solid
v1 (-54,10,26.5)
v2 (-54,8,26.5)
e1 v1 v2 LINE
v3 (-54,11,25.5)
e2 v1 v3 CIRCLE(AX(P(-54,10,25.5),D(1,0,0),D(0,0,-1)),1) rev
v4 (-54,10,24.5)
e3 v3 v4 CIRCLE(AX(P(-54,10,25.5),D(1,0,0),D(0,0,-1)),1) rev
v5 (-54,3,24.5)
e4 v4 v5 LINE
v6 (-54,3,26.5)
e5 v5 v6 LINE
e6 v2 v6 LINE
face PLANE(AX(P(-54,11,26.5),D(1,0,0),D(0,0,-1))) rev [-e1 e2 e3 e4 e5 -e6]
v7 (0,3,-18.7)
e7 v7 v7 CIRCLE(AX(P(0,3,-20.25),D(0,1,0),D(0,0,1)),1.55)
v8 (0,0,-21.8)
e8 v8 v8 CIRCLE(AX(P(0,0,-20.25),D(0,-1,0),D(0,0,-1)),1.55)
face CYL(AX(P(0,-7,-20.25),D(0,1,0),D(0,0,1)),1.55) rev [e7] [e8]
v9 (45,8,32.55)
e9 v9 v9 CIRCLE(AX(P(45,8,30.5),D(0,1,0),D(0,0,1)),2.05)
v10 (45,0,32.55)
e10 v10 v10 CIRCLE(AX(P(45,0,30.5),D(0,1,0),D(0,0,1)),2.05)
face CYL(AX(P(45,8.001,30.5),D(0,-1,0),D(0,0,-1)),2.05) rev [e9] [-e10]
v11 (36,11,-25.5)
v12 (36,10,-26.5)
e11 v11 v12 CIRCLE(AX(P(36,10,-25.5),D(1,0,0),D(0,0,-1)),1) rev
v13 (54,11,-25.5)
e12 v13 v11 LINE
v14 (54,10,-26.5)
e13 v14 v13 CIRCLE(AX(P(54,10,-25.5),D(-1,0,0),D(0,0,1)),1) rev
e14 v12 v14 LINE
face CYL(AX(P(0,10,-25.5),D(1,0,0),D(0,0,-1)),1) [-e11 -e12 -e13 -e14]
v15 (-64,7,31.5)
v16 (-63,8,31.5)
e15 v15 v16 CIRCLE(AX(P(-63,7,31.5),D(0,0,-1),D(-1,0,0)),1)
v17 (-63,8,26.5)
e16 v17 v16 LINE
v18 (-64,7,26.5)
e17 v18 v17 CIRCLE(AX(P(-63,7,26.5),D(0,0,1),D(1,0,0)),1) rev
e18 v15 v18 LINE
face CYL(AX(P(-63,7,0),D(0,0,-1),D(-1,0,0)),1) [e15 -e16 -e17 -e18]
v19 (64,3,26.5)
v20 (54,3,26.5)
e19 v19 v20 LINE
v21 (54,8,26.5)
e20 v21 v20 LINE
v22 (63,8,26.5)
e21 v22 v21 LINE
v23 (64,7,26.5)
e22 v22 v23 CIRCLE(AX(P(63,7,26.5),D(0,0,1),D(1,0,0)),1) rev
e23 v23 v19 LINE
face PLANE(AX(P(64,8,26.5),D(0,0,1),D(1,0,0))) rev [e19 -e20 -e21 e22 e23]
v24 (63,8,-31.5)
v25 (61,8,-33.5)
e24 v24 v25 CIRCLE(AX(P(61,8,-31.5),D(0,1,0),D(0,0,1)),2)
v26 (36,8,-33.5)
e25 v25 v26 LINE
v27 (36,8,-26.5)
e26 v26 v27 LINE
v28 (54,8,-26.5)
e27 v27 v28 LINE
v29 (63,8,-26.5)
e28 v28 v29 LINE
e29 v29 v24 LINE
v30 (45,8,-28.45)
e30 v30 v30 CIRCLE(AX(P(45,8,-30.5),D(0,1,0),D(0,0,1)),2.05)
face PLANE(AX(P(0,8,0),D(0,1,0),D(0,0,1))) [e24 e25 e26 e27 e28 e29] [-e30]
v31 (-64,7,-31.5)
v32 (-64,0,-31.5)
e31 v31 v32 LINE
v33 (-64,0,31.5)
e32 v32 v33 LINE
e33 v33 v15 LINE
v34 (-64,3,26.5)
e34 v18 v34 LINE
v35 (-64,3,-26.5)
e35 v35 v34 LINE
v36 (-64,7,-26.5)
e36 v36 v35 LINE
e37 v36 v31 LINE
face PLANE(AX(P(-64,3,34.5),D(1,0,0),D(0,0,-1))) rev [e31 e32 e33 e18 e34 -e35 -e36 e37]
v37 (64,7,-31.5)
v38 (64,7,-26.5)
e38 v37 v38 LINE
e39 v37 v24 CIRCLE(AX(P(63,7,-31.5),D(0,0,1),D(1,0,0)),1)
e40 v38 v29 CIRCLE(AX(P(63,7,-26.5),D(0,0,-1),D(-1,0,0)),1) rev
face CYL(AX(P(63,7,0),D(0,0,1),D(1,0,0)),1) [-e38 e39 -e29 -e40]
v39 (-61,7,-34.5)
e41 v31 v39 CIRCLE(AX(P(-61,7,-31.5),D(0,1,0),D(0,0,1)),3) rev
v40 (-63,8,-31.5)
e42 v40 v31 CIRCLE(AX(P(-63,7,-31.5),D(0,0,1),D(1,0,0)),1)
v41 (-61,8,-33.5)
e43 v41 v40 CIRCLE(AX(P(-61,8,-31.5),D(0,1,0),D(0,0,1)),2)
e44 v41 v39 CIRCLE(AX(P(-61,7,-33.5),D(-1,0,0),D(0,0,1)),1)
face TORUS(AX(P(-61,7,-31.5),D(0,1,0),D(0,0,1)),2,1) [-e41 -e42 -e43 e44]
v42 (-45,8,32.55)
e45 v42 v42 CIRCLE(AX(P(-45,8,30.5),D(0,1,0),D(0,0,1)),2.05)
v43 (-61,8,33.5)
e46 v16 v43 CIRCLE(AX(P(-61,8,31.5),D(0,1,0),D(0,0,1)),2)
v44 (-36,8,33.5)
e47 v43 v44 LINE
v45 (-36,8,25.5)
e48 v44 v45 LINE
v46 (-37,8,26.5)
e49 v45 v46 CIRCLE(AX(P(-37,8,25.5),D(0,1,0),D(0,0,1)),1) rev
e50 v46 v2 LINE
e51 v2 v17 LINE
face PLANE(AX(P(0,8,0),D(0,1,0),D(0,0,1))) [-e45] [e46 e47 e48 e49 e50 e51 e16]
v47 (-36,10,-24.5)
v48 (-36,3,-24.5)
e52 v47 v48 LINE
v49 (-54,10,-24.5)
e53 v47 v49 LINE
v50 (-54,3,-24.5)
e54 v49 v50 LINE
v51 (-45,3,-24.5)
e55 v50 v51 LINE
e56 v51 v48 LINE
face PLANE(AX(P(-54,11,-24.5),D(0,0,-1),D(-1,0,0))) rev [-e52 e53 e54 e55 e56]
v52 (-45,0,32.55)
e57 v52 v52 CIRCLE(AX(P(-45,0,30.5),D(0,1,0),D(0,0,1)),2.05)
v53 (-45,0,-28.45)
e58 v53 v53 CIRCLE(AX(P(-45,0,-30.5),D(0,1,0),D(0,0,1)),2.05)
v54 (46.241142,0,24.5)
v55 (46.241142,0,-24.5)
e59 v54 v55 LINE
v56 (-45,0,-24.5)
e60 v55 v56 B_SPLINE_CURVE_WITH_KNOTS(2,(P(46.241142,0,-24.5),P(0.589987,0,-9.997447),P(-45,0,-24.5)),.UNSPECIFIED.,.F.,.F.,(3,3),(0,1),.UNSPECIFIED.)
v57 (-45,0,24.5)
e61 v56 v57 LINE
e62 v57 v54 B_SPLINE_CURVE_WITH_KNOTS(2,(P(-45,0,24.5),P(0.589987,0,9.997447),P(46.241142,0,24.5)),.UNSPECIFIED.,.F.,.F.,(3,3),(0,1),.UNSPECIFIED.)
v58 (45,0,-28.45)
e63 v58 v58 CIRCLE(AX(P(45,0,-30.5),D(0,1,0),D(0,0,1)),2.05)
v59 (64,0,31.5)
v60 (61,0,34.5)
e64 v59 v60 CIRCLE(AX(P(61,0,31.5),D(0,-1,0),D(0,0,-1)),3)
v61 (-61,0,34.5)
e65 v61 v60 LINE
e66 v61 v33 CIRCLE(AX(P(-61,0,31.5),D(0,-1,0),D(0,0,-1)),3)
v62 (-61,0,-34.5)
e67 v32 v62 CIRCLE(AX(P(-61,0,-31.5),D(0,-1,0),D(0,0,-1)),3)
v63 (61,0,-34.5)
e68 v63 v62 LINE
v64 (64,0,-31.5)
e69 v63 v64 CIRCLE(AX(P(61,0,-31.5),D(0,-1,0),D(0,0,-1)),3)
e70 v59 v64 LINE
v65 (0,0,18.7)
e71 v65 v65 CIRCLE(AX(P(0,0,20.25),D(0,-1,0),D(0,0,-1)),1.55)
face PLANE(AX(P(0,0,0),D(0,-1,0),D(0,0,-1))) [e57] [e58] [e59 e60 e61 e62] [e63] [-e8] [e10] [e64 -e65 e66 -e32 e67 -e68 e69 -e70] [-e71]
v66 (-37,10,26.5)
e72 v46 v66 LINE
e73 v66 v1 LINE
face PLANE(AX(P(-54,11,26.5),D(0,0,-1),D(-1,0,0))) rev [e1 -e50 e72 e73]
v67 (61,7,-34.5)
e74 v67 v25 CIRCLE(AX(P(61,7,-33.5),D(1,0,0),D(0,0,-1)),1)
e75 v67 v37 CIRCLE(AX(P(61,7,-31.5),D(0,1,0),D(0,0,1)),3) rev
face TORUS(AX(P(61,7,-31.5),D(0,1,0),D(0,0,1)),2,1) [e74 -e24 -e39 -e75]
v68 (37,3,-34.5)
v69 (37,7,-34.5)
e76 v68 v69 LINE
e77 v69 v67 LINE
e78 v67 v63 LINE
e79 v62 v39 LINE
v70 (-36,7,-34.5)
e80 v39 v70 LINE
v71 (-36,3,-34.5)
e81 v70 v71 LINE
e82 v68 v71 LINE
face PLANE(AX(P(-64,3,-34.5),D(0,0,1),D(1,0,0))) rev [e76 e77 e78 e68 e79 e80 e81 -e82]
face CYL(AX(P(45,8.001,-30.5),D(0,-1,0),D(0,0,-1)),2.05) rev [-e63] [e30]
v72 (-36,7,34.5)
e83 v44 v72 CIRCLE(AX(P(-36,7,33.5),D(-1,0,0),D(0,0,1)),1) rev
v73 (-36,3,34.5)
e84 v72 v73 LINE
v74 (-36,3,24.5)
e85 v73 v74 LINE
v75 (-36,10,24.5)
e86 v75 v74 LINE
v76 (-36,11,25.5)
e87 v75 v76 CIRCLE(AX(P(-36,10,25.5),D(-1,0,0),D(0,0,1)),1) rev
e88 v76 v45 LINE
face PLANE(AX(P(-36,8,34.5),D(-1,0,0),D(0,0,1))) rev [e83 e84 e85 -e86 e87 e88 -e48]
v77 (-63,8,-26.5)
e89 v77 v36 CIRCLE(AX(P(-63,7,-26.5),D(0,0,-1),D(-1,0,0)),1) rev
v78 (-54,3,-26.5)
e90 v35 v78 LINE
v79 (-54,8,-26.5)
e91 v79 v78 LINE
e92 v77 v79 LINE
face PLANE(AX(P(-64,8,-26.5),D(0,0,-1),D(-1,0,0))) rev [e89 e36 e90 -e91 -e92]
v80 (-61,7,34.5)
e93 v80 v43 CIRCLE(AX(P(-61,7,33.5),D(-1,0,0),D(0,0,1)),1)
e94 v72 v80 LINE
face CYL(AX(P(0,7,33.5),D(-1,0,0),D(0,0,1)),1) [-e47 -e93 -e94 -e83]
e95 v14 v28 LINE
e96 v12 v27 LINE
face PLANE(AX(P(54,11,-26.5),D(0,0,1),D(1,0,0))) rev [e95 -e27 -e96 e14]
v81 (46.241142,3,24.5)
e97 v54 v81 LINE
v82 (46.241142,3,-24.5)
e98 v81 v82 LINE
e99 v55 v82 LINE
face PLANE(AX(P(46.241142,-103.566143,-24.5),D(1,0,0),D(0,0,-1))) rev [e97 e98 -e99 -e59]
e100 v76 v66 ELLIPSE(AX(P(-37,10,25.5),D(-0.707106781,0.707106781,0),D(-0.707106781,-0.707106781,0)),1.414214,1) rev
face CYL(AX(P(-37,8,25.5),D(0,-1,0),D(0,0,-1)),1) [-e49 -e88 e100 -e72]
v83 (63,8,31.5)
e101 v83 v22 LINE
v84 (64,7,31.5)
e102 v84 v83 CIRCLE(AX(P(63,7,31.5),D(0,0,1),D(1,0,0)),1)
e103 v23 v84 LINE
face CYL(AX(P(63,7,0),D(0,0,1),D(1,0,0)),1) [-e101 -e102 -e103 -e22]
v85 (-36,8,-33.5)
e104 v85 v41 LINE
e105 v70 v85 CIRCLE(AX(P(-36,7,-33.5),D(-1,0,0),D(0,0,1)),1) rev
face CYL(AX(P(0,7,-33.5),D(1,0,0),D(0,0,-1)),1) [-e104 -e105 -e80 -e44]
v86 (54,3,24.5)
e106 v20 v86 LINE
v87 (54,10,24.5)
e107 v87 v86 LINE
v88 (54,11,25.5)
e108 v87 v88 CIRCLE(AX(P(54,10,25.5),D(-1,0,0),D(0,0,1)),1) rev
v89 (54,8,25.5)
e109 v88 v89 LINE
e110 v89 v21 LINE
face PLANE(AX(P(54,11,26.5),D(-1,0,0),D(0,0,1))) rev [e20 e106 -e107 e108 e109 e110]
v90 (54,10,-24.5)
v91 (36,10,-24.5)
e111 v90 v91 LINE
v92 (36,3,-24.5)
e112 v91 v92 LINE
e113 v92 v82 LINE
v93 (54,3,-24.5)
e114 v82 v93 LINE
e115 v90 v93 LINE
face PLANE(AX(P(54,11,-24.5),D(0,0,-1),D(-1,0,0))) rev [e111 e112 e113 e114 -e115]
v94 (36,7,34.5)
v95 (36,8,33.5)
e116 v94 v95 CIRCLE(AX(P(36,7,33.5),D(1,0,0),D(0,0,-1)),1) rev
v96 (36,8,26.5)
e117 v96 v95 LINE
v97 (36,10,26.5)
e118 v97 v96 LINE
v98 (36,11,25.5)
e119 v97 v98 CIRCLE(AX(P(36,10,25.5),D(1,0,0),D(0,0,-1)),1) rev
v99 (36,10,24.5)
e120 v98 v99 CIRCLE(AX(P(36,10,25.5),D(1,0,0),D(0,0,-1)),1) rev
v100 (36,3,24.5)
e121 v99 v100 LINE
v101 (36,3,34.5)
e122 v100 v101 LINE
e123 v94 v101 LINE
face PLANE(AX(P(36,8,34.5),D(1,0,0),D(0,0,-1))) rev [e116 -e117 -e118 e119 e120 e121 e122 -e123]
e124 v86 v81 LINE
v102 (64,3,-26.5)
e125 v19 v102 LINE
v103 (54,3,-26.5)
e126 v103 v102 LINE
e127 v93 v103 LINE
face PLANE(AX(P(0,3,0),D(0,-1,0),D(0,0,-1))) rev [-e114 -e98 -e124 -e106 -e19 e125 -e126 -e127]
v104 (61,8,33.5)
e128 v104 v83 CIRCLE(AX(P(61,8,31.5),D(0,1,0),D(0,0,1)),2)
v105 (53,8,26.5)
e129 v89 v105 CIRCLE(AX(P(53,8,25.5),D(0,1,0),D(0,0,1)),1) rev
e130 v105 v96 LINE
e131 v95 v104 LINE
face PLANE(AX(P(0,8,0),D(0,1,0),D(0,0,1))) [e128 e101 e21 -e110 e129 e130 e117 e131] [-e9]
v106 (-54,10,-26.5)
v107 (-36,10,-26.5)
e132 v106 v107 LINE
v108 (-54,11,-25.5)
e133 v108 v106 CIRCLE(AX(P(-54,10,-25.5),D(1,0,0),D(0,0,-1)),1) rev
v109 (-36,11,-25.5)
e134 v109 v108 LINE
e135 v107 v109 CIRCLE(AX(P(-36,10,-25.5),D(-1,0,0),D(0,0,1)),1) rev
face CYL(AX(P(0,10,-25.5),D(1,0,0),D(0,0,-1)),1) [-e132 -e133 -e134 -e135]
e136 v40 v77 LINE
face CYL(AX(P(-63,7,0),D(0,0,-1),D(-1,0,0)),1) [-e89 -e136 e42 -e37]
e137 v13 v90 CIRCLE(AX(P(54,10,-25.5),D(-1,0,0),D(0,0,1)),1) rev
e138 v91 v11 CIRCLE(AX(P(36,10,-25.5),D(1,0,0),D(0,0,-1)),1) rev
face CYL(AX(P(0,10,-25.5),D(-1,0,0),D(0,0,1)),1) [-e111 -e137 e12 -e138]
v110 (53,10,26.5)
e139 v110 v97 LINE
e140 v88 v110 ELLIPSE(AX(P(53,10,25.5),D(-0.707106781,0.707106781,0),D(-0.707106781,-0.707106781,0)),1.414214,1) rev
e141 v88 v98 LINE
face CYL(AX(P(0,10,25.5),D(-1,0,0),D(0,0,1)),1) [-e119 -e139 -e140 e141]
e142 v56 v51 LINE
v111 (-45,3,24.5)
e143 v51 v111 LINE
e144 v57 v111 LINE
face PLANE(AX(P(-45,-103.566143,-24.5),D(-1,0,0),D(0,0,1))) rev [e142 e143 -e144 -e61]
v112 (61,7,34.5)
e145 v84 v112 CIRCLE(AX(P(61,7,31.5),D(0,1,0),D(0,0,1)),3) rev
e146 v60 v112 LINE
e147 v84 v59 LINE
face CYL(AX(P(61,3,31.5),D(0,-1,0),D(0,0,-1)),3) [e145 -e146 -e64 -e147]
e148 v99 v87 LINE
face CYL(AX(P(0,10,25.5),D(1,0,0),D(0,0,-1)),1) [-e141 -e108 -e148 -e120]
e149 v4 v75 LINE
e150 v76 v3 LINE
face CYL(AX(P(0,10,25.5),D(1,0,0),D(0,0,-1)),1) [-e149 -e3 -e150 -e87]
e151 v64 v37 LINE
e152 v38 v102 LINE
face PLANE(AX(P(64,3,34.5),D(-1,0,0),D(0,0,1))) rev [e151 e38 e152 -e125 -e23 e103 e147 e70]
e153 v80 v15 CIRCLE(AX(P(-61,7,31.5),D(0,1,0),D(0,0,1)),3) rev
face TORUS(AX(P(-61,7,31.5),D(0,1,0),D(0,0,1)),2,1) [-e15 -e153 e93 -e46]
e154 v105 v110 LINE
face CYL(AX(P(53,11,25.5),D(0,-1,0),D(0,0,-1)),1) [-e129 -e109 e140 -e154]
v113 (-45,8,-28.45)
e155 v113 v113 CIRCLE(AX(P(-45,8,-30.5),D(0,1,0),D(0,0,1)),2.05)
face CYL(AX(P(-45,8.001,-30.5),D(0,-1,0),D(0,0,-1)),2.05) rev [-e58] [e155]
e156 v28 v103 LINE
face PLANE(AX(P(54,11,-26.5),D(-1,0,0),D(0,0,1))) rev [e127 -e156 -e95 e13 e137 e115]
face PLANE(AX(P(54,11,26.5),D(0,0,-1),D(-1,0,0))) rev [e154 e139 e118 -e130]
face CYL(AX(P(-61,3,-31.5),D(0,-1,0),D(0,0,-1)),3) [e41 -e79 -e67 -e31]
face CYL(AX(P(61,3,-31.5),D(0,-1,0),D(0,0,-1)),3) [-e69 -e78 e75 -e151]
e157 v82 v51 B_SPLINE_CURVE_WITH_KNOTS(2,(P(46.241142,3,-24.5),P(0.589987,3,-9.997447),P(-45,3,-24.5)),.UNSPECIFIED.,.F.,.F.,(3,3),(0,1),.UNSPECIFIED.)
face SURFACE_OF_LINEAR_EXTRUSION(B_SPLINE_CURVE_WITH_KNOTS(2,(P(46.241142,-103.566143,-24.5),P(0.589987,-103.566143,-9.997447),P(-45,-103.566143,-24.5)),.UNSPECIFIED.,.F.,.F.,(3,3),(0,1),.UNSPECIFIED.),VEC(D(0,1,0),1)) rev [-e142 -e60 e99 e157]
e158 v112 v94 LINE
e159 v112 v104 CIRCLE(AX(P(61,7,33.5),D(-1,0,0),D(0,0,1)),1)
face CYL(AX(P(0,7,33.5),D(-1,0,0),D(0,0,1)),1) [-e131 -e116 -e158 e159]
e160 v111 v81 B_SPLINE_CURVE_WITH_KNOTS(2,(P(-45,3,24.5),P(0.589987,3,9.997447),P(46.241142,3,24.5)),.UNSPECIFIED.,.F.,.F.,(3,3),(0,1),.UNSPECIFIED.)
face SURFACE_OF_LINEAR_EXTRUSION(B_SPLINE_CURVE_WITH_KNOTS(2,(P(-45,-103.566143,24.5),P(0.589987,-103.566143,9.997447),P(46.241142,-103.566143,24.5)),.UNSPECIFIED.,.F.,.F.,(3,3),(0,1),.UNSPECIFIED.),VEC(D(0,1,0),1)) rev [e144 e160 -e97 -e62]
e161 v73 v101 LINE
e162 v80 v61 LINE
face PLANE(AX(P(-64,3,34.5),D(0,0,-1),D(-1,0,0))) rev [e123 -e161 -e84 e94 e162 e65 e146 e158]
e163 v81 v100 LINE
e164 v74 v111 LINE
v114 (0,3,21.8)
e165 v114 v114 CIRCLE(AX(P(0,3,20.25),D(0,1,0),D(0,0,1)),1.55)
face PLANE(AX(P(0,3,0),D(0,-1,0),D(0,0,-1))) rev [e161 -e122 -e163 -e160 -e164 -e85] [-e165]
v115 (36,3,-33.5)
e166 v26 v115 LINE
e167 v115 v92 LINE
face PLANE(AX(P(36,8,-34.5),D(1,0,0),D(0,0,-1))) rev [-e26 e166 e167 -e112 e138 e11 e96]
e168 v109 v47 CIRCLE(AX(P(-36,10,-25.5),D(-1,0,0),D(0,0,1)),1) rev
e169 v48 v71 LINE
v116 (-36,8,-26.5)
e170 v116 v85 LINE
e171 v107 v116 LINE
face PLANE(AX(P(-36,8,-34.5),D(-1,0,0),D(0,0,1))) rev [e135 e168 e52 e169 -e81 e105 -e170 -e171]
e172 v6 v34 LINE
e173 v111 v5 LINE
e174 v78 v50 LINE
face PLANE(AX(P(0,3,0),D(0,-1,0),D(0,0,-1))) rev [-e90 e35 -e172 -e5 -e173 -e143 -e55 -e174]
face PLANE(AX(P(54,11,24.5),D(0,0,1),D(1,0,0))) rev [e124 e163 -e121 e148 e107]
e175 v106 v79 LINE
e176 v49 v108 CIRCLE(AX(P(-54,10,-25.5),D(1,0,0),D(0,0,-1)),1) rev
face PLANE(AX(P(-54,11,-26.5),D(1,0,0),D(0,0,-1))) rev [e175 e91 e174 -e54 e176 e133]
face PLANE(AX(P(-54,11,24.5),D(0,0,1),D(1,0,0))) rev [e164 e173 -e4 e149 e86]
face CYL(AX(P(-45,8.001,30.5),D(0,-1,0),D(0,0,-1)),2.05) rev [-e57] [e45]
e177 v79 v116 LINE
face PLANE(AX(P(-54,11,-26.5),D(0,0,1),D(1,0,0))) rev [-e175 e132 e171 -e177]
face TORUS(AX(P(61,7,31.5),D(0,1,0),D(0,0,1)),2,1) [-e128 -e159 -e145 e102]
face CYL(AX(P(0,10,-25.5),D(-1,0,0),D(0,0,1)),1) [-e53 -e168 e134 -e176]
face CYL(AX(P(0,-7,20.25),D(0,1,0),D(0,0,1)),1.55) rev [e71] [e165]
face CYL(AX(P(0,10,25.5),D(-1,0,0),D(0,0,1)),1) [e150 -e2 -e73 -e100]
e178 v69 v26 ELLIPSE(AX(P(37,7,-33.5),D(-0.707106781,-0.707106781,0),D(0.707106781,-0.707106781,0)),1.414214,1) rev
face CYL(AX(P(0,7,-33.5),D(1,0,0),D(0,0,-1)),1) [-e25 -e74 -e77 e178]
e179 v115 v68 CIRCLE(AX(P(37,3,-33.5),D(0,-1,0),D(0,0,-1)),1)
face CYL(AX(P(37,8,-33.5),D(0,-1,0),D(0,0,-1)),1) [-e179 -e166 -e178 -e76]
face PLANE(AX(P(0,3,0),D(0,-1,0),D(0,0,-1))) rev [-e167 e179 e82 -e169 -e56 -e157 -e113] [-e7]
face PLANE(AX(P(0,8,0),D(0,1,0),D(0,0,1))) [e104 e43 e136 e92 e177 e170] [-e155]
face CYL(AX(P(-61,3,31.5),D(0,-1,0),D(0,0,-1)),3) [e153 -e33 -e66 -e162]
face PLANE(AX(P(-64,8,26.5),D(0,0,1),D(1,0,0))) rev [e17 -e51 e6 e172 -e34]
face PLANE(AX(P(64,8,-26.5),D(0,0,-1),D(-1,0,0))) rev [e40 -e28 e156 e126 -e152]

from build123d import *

# Parameters (mm, degrees)
SKETCH1_W                      = 128
SKETCH1_H                      = 69
BOSS_EXTRUDE1_DEPTH            = 3
SKETCH5_R                      = 1.55
CUT_EXTRUDE5_DEPTH             = 10
SKETCH7_W                      = 28
SKETCH7_H                      = 8
BOSS_EXTRUDE2_DEPTH            = 5
SKETCH2_R                      = 2.05
CUT_EXTRUDE6_DEPTH             = 73.878323252
CUT_EXTRUDE6_DIRECTION_2_REACH = 74.878
CUT_EXTRUDE7_DEPTH             = 3
SKETCH8_W                      = 18
SKETCH8_H                      = 2
BOSS_EXTRUDE3_DEPTH            = 8
FILLET1_R                      = 3
FILLET2_R                      = 1


with BuildPart() as part:
    # Sketch1 → Boss-Extrude1 (new body)
    with BuildSketch(Plane(origin=(0, 0, 0), x_dir=(1, 0, 0), z_dir=(0, 1, 0))):
        Rectangle(SKETCH1_W, SKETCH1_H)
    extrude(amount=BOSS_EXTRUDE1_DEPTH)

    # Sketch5 → Cut-Extrude5 (cut)
    with BuildSketch(Plane(origin=(0, 3, 0), x_dir=(1, 0, 0), z_dir=(0, 1, 0))):
        with Locations(Location((0, -20.25, 0), (0, 0, 270))):
            Circle(SKETCH5_R)
        with Locations(Location((0, 20.25, 0), (0, 0, 270))):
            Circle(SKETCH5_R)
    extrude(amount=-CUT_EXTRUDE5_DEPTH, mode=Mode.SUBTRACT)

    # Sketch7 → Boss-Extrude2 (add)
    with BuildSketch(Plane(origin=(0, 3, 0), x_dir=(1, 0, 0), z_dir=(0, 1, 0))):
        with Locations((-50, 30.5)):
            Rectangle(SKETCH7_W, SKETCH7_H)
        with Locations((50, 30.5)):
            Rectangle(SKETCH7_W, SKETCH7_H)
        with Locations((50, -30.5)):
            Rectangle(SKETCH7_W, SKETCH7_H)
        with Locations((-50, -30.5)):
            Rectangle(SKETCH7_W, SKETCH7_H)
    extrude(amount=BOSS_EXTRUDE2_DEPTH)

    # Sketch2 → Cut-Extrude6 (cut)
    with BuildSketch(Plane(origin=(0, 3, 0), x_dir=(1, 0, 0), z_dir=(0, 1, 0))):
        with Locations(Location((-45, 30.5, 0), (0, 0, 270))):
            Circle(SKETCH2_R)
        with Locations(Location((45, 30.5, 0), (0, 0, 270))):
            Circle(SKETCH2_R)
        with Locations(Location((45, -30.5, 0), (0, 0, 270))):
            Circle(SKETCH2_R)
        with Locations(Location((-45, -30.5, 0), (0, 0, 270))):
            Circle(SKETCH2_R)
    extrude(amount=-CUT_EXTRUDE6_DEPTH, mode=Mode.SUBTRACT)

    # Sketch2 → Cut-Extrude6 direction 2 (cut, up to next)
    with BuildSketch(Plane(origin=(0, 3, 0), x_dir=(1, 0, 0), z_dir=(0, 1, 0)), mode=Mode.PRIVATE) as cut_extrude6_direction_2_sk1:
        with Locations(Location((-45, 30.5, 0), (0, 0, 270))):
            Circle(SKETCH2_R)
    cut_extrude6_direction_2_tool1 = extrude(cut_extrude6_direction_2_sk1.sketch, amount=CUT_EXTRUDE6_DIRECTION_2_REACH, mode=Mode.PRIVATE) & part.part
    # Sketch2 → Cut-Extrude6 direction 2 (cut, up to next)
    with BuildSketch(Plane(origin=(0, 3, 0), x_dir=(1, 0, 0), z_dir=(0, 1, 0)), mode=Mode.PRIVATE) as cut_extrude6_direction_2_sk2:
        with Locations(Location((45, 30.5, 0), (0, 0, 270))):
            Circle(SKETCH2_R)
    cut_extrude6_direction_2_tool2 = extrude(cut_extrude6_direction_2_sk2.sketch, amount=CUT_EXTRUDE6_DIRECTION_2_REACH, mode=Mode.PRIVATE) & part.part
    # Sketch2 → Cut-Extrude6 direction 2 (cut, up to next)
    with BuildSketch(Plane(origin=(0, 3, 0), x_dir=(1, 0, 0), z_dir=(0, 1, 0)), mode=Mode.PRIVATE) as cut_extrude6_direction_2_sk3:
        with Locations(Location((45, -30.5, 0), (0, 0, 270))):
            Circle(SKETCH2_R)
    cut_extrude6_direction_2_tool3 = extrude(cut_extrude6_direction_2_sk3.sketch, amount=CUT_EXTRUDE6_DIRECTION_2_REACH, mode=Mode.PRIVATE) & part.part
    # Sketch2 → Cut-Extrude6 direction 2 (cut, up to next)
    with BuildSketch(Plane(origin=(0, 3, 0), x_dir=(1, 0, 0), z_dir=(0, 1, 0)), mode=Mode.PRIVATE) as cut_extrude6_direction_2_sk4:
        with Locations(Location((-45, -30.5, 0), (0, 0, 270))):
            Circle(SKETCH2_R)
    cut_extrude6_direction_2_tool4 = extrude(cut_extrude6_direction_2_sk4.sketch, amount=CUT_EXTRUDE6_DIRECTION_2_REACH, mode=Mode.PRIVATE) & part.part
    add(cut_extrude6_direction_2_tool1.solids().sort_by_distance((-45, 3, -30.5))[0], mode=Mode.SUBTRACT)
    add(cut_extrude6_direction_2_tool2.solids().sort_by_distance((45, 3, -30.5))[0], mode=Mode.SUBTRACT)
    add(cut_extrude6_direction_2_tool3.solids().sort_by_distance((45, 3, 30.5))[0], mode=Mode.SUBTRACT)
    add(cut_extrude6_direction_2_tool4.solids().sort_by_distance((-45, 3, 30.5))[0], mode=Mode.SUBTRACT)

    # Sketch6 → Cut-Extrude7 (cut)
    with BuildSketch(Plane(origin=(0, 3, 0), x_dir=(1, 0, 0), z_dir=(0, 1, 0))):
        with BuildLine():
            Line((-45, 24.5), (-45, -24.5))
            add(Edge.make_bspline(
                [(-45, -24.5), (0.589986909, -9.997447075), (46.241142194, -24.5)],
                knots=[0, 0, 0, 1, 1, 1], degree=2))
            Line((46.241142194, -24.5), (46.241142194, 24.5))
            add(Edge.make_bspline(
                [(-45, 24.5), (0.589986909, 9.997447075), (46.241142194, 24.5)],
                knots=[0, 0, 0, 1, 1, 1], degree=2))
        make_face()
    extrude(amount=-CUT_EXTRUDE7_DEPTH, mode=Mode.SUBTRACT)

    # Sketch8 → Boss-Extrude3 (add)
    with BuildSketch(Plane(origin=(0, 3, 0), x_dir=(1, 0, 0), z_dir=(0, 1, 0))):
        with Locations((-45, 25.5)):
            Rectangle(SKETCH8_W, SKETCH8_H)
        with Locations((-45, -25.5)):
            Rectangle(SKETCH8_W, SKETCH8_H)
        with Locations((45, -25.5)):
            Rectangle(SKETCH8_W, SKETCH8_H)
        with Locations((45, 25.5)):
            Rectangle(SKETCH8_W, SKETCH8_H)
    extrude(amount=BOSS_EXTRUDE3_DEPTH)

    # Fillet1
    fillet1_edges = [part.edges().sort_by_distance(p)[0] for p in [
        (64, 4, 34.5),
        (-64, 4, 34.5),
        (-64, 4, -34.5),
        (64, 4, -34.5),
    ]]
    fillet(fillet1_edges, radius=FILLET1_R)

    # Fillet2
    fillet2_edges = [part.edges().sort_by_distance(p)[0] for p in [
        (64, 8, -29),
        (63.121320344, 8, -33.621320344),
        (48.5, 8, -34.5),
        (36, 5.5, -34.5),
        (45, 11, -24.5),
        (45, 11, -26.5),
        (45, 11, 26.5),
        (45, 11, 24.5),
        (-45, 11, 26.5),
        (-45, 11, 24.5),
        (-45, 11, -24.5),
        (-45, 11, -26.5),
        (-64, 8, -29),
        (-63.121320344, 8, -33.621320344),
        (-64, 8, 29),
        (-63.121320344, 8, 33.621320344),
        (48.5, 8, 34.5),
        (63.121320344, 8, 33.621320344),
        (-48.5, 8, -34.5),
        (-48.5, 8, 34.5),
        (-36, 9.5, 26.5),
        (54, 9.5, 26.5),
        (64, 8, 29),
    ]]
    fillet(fillet2_edges, radius=FILLET2_R - 0.0001)  # a hair under: the kernel refuses the full size


solid = part.part
